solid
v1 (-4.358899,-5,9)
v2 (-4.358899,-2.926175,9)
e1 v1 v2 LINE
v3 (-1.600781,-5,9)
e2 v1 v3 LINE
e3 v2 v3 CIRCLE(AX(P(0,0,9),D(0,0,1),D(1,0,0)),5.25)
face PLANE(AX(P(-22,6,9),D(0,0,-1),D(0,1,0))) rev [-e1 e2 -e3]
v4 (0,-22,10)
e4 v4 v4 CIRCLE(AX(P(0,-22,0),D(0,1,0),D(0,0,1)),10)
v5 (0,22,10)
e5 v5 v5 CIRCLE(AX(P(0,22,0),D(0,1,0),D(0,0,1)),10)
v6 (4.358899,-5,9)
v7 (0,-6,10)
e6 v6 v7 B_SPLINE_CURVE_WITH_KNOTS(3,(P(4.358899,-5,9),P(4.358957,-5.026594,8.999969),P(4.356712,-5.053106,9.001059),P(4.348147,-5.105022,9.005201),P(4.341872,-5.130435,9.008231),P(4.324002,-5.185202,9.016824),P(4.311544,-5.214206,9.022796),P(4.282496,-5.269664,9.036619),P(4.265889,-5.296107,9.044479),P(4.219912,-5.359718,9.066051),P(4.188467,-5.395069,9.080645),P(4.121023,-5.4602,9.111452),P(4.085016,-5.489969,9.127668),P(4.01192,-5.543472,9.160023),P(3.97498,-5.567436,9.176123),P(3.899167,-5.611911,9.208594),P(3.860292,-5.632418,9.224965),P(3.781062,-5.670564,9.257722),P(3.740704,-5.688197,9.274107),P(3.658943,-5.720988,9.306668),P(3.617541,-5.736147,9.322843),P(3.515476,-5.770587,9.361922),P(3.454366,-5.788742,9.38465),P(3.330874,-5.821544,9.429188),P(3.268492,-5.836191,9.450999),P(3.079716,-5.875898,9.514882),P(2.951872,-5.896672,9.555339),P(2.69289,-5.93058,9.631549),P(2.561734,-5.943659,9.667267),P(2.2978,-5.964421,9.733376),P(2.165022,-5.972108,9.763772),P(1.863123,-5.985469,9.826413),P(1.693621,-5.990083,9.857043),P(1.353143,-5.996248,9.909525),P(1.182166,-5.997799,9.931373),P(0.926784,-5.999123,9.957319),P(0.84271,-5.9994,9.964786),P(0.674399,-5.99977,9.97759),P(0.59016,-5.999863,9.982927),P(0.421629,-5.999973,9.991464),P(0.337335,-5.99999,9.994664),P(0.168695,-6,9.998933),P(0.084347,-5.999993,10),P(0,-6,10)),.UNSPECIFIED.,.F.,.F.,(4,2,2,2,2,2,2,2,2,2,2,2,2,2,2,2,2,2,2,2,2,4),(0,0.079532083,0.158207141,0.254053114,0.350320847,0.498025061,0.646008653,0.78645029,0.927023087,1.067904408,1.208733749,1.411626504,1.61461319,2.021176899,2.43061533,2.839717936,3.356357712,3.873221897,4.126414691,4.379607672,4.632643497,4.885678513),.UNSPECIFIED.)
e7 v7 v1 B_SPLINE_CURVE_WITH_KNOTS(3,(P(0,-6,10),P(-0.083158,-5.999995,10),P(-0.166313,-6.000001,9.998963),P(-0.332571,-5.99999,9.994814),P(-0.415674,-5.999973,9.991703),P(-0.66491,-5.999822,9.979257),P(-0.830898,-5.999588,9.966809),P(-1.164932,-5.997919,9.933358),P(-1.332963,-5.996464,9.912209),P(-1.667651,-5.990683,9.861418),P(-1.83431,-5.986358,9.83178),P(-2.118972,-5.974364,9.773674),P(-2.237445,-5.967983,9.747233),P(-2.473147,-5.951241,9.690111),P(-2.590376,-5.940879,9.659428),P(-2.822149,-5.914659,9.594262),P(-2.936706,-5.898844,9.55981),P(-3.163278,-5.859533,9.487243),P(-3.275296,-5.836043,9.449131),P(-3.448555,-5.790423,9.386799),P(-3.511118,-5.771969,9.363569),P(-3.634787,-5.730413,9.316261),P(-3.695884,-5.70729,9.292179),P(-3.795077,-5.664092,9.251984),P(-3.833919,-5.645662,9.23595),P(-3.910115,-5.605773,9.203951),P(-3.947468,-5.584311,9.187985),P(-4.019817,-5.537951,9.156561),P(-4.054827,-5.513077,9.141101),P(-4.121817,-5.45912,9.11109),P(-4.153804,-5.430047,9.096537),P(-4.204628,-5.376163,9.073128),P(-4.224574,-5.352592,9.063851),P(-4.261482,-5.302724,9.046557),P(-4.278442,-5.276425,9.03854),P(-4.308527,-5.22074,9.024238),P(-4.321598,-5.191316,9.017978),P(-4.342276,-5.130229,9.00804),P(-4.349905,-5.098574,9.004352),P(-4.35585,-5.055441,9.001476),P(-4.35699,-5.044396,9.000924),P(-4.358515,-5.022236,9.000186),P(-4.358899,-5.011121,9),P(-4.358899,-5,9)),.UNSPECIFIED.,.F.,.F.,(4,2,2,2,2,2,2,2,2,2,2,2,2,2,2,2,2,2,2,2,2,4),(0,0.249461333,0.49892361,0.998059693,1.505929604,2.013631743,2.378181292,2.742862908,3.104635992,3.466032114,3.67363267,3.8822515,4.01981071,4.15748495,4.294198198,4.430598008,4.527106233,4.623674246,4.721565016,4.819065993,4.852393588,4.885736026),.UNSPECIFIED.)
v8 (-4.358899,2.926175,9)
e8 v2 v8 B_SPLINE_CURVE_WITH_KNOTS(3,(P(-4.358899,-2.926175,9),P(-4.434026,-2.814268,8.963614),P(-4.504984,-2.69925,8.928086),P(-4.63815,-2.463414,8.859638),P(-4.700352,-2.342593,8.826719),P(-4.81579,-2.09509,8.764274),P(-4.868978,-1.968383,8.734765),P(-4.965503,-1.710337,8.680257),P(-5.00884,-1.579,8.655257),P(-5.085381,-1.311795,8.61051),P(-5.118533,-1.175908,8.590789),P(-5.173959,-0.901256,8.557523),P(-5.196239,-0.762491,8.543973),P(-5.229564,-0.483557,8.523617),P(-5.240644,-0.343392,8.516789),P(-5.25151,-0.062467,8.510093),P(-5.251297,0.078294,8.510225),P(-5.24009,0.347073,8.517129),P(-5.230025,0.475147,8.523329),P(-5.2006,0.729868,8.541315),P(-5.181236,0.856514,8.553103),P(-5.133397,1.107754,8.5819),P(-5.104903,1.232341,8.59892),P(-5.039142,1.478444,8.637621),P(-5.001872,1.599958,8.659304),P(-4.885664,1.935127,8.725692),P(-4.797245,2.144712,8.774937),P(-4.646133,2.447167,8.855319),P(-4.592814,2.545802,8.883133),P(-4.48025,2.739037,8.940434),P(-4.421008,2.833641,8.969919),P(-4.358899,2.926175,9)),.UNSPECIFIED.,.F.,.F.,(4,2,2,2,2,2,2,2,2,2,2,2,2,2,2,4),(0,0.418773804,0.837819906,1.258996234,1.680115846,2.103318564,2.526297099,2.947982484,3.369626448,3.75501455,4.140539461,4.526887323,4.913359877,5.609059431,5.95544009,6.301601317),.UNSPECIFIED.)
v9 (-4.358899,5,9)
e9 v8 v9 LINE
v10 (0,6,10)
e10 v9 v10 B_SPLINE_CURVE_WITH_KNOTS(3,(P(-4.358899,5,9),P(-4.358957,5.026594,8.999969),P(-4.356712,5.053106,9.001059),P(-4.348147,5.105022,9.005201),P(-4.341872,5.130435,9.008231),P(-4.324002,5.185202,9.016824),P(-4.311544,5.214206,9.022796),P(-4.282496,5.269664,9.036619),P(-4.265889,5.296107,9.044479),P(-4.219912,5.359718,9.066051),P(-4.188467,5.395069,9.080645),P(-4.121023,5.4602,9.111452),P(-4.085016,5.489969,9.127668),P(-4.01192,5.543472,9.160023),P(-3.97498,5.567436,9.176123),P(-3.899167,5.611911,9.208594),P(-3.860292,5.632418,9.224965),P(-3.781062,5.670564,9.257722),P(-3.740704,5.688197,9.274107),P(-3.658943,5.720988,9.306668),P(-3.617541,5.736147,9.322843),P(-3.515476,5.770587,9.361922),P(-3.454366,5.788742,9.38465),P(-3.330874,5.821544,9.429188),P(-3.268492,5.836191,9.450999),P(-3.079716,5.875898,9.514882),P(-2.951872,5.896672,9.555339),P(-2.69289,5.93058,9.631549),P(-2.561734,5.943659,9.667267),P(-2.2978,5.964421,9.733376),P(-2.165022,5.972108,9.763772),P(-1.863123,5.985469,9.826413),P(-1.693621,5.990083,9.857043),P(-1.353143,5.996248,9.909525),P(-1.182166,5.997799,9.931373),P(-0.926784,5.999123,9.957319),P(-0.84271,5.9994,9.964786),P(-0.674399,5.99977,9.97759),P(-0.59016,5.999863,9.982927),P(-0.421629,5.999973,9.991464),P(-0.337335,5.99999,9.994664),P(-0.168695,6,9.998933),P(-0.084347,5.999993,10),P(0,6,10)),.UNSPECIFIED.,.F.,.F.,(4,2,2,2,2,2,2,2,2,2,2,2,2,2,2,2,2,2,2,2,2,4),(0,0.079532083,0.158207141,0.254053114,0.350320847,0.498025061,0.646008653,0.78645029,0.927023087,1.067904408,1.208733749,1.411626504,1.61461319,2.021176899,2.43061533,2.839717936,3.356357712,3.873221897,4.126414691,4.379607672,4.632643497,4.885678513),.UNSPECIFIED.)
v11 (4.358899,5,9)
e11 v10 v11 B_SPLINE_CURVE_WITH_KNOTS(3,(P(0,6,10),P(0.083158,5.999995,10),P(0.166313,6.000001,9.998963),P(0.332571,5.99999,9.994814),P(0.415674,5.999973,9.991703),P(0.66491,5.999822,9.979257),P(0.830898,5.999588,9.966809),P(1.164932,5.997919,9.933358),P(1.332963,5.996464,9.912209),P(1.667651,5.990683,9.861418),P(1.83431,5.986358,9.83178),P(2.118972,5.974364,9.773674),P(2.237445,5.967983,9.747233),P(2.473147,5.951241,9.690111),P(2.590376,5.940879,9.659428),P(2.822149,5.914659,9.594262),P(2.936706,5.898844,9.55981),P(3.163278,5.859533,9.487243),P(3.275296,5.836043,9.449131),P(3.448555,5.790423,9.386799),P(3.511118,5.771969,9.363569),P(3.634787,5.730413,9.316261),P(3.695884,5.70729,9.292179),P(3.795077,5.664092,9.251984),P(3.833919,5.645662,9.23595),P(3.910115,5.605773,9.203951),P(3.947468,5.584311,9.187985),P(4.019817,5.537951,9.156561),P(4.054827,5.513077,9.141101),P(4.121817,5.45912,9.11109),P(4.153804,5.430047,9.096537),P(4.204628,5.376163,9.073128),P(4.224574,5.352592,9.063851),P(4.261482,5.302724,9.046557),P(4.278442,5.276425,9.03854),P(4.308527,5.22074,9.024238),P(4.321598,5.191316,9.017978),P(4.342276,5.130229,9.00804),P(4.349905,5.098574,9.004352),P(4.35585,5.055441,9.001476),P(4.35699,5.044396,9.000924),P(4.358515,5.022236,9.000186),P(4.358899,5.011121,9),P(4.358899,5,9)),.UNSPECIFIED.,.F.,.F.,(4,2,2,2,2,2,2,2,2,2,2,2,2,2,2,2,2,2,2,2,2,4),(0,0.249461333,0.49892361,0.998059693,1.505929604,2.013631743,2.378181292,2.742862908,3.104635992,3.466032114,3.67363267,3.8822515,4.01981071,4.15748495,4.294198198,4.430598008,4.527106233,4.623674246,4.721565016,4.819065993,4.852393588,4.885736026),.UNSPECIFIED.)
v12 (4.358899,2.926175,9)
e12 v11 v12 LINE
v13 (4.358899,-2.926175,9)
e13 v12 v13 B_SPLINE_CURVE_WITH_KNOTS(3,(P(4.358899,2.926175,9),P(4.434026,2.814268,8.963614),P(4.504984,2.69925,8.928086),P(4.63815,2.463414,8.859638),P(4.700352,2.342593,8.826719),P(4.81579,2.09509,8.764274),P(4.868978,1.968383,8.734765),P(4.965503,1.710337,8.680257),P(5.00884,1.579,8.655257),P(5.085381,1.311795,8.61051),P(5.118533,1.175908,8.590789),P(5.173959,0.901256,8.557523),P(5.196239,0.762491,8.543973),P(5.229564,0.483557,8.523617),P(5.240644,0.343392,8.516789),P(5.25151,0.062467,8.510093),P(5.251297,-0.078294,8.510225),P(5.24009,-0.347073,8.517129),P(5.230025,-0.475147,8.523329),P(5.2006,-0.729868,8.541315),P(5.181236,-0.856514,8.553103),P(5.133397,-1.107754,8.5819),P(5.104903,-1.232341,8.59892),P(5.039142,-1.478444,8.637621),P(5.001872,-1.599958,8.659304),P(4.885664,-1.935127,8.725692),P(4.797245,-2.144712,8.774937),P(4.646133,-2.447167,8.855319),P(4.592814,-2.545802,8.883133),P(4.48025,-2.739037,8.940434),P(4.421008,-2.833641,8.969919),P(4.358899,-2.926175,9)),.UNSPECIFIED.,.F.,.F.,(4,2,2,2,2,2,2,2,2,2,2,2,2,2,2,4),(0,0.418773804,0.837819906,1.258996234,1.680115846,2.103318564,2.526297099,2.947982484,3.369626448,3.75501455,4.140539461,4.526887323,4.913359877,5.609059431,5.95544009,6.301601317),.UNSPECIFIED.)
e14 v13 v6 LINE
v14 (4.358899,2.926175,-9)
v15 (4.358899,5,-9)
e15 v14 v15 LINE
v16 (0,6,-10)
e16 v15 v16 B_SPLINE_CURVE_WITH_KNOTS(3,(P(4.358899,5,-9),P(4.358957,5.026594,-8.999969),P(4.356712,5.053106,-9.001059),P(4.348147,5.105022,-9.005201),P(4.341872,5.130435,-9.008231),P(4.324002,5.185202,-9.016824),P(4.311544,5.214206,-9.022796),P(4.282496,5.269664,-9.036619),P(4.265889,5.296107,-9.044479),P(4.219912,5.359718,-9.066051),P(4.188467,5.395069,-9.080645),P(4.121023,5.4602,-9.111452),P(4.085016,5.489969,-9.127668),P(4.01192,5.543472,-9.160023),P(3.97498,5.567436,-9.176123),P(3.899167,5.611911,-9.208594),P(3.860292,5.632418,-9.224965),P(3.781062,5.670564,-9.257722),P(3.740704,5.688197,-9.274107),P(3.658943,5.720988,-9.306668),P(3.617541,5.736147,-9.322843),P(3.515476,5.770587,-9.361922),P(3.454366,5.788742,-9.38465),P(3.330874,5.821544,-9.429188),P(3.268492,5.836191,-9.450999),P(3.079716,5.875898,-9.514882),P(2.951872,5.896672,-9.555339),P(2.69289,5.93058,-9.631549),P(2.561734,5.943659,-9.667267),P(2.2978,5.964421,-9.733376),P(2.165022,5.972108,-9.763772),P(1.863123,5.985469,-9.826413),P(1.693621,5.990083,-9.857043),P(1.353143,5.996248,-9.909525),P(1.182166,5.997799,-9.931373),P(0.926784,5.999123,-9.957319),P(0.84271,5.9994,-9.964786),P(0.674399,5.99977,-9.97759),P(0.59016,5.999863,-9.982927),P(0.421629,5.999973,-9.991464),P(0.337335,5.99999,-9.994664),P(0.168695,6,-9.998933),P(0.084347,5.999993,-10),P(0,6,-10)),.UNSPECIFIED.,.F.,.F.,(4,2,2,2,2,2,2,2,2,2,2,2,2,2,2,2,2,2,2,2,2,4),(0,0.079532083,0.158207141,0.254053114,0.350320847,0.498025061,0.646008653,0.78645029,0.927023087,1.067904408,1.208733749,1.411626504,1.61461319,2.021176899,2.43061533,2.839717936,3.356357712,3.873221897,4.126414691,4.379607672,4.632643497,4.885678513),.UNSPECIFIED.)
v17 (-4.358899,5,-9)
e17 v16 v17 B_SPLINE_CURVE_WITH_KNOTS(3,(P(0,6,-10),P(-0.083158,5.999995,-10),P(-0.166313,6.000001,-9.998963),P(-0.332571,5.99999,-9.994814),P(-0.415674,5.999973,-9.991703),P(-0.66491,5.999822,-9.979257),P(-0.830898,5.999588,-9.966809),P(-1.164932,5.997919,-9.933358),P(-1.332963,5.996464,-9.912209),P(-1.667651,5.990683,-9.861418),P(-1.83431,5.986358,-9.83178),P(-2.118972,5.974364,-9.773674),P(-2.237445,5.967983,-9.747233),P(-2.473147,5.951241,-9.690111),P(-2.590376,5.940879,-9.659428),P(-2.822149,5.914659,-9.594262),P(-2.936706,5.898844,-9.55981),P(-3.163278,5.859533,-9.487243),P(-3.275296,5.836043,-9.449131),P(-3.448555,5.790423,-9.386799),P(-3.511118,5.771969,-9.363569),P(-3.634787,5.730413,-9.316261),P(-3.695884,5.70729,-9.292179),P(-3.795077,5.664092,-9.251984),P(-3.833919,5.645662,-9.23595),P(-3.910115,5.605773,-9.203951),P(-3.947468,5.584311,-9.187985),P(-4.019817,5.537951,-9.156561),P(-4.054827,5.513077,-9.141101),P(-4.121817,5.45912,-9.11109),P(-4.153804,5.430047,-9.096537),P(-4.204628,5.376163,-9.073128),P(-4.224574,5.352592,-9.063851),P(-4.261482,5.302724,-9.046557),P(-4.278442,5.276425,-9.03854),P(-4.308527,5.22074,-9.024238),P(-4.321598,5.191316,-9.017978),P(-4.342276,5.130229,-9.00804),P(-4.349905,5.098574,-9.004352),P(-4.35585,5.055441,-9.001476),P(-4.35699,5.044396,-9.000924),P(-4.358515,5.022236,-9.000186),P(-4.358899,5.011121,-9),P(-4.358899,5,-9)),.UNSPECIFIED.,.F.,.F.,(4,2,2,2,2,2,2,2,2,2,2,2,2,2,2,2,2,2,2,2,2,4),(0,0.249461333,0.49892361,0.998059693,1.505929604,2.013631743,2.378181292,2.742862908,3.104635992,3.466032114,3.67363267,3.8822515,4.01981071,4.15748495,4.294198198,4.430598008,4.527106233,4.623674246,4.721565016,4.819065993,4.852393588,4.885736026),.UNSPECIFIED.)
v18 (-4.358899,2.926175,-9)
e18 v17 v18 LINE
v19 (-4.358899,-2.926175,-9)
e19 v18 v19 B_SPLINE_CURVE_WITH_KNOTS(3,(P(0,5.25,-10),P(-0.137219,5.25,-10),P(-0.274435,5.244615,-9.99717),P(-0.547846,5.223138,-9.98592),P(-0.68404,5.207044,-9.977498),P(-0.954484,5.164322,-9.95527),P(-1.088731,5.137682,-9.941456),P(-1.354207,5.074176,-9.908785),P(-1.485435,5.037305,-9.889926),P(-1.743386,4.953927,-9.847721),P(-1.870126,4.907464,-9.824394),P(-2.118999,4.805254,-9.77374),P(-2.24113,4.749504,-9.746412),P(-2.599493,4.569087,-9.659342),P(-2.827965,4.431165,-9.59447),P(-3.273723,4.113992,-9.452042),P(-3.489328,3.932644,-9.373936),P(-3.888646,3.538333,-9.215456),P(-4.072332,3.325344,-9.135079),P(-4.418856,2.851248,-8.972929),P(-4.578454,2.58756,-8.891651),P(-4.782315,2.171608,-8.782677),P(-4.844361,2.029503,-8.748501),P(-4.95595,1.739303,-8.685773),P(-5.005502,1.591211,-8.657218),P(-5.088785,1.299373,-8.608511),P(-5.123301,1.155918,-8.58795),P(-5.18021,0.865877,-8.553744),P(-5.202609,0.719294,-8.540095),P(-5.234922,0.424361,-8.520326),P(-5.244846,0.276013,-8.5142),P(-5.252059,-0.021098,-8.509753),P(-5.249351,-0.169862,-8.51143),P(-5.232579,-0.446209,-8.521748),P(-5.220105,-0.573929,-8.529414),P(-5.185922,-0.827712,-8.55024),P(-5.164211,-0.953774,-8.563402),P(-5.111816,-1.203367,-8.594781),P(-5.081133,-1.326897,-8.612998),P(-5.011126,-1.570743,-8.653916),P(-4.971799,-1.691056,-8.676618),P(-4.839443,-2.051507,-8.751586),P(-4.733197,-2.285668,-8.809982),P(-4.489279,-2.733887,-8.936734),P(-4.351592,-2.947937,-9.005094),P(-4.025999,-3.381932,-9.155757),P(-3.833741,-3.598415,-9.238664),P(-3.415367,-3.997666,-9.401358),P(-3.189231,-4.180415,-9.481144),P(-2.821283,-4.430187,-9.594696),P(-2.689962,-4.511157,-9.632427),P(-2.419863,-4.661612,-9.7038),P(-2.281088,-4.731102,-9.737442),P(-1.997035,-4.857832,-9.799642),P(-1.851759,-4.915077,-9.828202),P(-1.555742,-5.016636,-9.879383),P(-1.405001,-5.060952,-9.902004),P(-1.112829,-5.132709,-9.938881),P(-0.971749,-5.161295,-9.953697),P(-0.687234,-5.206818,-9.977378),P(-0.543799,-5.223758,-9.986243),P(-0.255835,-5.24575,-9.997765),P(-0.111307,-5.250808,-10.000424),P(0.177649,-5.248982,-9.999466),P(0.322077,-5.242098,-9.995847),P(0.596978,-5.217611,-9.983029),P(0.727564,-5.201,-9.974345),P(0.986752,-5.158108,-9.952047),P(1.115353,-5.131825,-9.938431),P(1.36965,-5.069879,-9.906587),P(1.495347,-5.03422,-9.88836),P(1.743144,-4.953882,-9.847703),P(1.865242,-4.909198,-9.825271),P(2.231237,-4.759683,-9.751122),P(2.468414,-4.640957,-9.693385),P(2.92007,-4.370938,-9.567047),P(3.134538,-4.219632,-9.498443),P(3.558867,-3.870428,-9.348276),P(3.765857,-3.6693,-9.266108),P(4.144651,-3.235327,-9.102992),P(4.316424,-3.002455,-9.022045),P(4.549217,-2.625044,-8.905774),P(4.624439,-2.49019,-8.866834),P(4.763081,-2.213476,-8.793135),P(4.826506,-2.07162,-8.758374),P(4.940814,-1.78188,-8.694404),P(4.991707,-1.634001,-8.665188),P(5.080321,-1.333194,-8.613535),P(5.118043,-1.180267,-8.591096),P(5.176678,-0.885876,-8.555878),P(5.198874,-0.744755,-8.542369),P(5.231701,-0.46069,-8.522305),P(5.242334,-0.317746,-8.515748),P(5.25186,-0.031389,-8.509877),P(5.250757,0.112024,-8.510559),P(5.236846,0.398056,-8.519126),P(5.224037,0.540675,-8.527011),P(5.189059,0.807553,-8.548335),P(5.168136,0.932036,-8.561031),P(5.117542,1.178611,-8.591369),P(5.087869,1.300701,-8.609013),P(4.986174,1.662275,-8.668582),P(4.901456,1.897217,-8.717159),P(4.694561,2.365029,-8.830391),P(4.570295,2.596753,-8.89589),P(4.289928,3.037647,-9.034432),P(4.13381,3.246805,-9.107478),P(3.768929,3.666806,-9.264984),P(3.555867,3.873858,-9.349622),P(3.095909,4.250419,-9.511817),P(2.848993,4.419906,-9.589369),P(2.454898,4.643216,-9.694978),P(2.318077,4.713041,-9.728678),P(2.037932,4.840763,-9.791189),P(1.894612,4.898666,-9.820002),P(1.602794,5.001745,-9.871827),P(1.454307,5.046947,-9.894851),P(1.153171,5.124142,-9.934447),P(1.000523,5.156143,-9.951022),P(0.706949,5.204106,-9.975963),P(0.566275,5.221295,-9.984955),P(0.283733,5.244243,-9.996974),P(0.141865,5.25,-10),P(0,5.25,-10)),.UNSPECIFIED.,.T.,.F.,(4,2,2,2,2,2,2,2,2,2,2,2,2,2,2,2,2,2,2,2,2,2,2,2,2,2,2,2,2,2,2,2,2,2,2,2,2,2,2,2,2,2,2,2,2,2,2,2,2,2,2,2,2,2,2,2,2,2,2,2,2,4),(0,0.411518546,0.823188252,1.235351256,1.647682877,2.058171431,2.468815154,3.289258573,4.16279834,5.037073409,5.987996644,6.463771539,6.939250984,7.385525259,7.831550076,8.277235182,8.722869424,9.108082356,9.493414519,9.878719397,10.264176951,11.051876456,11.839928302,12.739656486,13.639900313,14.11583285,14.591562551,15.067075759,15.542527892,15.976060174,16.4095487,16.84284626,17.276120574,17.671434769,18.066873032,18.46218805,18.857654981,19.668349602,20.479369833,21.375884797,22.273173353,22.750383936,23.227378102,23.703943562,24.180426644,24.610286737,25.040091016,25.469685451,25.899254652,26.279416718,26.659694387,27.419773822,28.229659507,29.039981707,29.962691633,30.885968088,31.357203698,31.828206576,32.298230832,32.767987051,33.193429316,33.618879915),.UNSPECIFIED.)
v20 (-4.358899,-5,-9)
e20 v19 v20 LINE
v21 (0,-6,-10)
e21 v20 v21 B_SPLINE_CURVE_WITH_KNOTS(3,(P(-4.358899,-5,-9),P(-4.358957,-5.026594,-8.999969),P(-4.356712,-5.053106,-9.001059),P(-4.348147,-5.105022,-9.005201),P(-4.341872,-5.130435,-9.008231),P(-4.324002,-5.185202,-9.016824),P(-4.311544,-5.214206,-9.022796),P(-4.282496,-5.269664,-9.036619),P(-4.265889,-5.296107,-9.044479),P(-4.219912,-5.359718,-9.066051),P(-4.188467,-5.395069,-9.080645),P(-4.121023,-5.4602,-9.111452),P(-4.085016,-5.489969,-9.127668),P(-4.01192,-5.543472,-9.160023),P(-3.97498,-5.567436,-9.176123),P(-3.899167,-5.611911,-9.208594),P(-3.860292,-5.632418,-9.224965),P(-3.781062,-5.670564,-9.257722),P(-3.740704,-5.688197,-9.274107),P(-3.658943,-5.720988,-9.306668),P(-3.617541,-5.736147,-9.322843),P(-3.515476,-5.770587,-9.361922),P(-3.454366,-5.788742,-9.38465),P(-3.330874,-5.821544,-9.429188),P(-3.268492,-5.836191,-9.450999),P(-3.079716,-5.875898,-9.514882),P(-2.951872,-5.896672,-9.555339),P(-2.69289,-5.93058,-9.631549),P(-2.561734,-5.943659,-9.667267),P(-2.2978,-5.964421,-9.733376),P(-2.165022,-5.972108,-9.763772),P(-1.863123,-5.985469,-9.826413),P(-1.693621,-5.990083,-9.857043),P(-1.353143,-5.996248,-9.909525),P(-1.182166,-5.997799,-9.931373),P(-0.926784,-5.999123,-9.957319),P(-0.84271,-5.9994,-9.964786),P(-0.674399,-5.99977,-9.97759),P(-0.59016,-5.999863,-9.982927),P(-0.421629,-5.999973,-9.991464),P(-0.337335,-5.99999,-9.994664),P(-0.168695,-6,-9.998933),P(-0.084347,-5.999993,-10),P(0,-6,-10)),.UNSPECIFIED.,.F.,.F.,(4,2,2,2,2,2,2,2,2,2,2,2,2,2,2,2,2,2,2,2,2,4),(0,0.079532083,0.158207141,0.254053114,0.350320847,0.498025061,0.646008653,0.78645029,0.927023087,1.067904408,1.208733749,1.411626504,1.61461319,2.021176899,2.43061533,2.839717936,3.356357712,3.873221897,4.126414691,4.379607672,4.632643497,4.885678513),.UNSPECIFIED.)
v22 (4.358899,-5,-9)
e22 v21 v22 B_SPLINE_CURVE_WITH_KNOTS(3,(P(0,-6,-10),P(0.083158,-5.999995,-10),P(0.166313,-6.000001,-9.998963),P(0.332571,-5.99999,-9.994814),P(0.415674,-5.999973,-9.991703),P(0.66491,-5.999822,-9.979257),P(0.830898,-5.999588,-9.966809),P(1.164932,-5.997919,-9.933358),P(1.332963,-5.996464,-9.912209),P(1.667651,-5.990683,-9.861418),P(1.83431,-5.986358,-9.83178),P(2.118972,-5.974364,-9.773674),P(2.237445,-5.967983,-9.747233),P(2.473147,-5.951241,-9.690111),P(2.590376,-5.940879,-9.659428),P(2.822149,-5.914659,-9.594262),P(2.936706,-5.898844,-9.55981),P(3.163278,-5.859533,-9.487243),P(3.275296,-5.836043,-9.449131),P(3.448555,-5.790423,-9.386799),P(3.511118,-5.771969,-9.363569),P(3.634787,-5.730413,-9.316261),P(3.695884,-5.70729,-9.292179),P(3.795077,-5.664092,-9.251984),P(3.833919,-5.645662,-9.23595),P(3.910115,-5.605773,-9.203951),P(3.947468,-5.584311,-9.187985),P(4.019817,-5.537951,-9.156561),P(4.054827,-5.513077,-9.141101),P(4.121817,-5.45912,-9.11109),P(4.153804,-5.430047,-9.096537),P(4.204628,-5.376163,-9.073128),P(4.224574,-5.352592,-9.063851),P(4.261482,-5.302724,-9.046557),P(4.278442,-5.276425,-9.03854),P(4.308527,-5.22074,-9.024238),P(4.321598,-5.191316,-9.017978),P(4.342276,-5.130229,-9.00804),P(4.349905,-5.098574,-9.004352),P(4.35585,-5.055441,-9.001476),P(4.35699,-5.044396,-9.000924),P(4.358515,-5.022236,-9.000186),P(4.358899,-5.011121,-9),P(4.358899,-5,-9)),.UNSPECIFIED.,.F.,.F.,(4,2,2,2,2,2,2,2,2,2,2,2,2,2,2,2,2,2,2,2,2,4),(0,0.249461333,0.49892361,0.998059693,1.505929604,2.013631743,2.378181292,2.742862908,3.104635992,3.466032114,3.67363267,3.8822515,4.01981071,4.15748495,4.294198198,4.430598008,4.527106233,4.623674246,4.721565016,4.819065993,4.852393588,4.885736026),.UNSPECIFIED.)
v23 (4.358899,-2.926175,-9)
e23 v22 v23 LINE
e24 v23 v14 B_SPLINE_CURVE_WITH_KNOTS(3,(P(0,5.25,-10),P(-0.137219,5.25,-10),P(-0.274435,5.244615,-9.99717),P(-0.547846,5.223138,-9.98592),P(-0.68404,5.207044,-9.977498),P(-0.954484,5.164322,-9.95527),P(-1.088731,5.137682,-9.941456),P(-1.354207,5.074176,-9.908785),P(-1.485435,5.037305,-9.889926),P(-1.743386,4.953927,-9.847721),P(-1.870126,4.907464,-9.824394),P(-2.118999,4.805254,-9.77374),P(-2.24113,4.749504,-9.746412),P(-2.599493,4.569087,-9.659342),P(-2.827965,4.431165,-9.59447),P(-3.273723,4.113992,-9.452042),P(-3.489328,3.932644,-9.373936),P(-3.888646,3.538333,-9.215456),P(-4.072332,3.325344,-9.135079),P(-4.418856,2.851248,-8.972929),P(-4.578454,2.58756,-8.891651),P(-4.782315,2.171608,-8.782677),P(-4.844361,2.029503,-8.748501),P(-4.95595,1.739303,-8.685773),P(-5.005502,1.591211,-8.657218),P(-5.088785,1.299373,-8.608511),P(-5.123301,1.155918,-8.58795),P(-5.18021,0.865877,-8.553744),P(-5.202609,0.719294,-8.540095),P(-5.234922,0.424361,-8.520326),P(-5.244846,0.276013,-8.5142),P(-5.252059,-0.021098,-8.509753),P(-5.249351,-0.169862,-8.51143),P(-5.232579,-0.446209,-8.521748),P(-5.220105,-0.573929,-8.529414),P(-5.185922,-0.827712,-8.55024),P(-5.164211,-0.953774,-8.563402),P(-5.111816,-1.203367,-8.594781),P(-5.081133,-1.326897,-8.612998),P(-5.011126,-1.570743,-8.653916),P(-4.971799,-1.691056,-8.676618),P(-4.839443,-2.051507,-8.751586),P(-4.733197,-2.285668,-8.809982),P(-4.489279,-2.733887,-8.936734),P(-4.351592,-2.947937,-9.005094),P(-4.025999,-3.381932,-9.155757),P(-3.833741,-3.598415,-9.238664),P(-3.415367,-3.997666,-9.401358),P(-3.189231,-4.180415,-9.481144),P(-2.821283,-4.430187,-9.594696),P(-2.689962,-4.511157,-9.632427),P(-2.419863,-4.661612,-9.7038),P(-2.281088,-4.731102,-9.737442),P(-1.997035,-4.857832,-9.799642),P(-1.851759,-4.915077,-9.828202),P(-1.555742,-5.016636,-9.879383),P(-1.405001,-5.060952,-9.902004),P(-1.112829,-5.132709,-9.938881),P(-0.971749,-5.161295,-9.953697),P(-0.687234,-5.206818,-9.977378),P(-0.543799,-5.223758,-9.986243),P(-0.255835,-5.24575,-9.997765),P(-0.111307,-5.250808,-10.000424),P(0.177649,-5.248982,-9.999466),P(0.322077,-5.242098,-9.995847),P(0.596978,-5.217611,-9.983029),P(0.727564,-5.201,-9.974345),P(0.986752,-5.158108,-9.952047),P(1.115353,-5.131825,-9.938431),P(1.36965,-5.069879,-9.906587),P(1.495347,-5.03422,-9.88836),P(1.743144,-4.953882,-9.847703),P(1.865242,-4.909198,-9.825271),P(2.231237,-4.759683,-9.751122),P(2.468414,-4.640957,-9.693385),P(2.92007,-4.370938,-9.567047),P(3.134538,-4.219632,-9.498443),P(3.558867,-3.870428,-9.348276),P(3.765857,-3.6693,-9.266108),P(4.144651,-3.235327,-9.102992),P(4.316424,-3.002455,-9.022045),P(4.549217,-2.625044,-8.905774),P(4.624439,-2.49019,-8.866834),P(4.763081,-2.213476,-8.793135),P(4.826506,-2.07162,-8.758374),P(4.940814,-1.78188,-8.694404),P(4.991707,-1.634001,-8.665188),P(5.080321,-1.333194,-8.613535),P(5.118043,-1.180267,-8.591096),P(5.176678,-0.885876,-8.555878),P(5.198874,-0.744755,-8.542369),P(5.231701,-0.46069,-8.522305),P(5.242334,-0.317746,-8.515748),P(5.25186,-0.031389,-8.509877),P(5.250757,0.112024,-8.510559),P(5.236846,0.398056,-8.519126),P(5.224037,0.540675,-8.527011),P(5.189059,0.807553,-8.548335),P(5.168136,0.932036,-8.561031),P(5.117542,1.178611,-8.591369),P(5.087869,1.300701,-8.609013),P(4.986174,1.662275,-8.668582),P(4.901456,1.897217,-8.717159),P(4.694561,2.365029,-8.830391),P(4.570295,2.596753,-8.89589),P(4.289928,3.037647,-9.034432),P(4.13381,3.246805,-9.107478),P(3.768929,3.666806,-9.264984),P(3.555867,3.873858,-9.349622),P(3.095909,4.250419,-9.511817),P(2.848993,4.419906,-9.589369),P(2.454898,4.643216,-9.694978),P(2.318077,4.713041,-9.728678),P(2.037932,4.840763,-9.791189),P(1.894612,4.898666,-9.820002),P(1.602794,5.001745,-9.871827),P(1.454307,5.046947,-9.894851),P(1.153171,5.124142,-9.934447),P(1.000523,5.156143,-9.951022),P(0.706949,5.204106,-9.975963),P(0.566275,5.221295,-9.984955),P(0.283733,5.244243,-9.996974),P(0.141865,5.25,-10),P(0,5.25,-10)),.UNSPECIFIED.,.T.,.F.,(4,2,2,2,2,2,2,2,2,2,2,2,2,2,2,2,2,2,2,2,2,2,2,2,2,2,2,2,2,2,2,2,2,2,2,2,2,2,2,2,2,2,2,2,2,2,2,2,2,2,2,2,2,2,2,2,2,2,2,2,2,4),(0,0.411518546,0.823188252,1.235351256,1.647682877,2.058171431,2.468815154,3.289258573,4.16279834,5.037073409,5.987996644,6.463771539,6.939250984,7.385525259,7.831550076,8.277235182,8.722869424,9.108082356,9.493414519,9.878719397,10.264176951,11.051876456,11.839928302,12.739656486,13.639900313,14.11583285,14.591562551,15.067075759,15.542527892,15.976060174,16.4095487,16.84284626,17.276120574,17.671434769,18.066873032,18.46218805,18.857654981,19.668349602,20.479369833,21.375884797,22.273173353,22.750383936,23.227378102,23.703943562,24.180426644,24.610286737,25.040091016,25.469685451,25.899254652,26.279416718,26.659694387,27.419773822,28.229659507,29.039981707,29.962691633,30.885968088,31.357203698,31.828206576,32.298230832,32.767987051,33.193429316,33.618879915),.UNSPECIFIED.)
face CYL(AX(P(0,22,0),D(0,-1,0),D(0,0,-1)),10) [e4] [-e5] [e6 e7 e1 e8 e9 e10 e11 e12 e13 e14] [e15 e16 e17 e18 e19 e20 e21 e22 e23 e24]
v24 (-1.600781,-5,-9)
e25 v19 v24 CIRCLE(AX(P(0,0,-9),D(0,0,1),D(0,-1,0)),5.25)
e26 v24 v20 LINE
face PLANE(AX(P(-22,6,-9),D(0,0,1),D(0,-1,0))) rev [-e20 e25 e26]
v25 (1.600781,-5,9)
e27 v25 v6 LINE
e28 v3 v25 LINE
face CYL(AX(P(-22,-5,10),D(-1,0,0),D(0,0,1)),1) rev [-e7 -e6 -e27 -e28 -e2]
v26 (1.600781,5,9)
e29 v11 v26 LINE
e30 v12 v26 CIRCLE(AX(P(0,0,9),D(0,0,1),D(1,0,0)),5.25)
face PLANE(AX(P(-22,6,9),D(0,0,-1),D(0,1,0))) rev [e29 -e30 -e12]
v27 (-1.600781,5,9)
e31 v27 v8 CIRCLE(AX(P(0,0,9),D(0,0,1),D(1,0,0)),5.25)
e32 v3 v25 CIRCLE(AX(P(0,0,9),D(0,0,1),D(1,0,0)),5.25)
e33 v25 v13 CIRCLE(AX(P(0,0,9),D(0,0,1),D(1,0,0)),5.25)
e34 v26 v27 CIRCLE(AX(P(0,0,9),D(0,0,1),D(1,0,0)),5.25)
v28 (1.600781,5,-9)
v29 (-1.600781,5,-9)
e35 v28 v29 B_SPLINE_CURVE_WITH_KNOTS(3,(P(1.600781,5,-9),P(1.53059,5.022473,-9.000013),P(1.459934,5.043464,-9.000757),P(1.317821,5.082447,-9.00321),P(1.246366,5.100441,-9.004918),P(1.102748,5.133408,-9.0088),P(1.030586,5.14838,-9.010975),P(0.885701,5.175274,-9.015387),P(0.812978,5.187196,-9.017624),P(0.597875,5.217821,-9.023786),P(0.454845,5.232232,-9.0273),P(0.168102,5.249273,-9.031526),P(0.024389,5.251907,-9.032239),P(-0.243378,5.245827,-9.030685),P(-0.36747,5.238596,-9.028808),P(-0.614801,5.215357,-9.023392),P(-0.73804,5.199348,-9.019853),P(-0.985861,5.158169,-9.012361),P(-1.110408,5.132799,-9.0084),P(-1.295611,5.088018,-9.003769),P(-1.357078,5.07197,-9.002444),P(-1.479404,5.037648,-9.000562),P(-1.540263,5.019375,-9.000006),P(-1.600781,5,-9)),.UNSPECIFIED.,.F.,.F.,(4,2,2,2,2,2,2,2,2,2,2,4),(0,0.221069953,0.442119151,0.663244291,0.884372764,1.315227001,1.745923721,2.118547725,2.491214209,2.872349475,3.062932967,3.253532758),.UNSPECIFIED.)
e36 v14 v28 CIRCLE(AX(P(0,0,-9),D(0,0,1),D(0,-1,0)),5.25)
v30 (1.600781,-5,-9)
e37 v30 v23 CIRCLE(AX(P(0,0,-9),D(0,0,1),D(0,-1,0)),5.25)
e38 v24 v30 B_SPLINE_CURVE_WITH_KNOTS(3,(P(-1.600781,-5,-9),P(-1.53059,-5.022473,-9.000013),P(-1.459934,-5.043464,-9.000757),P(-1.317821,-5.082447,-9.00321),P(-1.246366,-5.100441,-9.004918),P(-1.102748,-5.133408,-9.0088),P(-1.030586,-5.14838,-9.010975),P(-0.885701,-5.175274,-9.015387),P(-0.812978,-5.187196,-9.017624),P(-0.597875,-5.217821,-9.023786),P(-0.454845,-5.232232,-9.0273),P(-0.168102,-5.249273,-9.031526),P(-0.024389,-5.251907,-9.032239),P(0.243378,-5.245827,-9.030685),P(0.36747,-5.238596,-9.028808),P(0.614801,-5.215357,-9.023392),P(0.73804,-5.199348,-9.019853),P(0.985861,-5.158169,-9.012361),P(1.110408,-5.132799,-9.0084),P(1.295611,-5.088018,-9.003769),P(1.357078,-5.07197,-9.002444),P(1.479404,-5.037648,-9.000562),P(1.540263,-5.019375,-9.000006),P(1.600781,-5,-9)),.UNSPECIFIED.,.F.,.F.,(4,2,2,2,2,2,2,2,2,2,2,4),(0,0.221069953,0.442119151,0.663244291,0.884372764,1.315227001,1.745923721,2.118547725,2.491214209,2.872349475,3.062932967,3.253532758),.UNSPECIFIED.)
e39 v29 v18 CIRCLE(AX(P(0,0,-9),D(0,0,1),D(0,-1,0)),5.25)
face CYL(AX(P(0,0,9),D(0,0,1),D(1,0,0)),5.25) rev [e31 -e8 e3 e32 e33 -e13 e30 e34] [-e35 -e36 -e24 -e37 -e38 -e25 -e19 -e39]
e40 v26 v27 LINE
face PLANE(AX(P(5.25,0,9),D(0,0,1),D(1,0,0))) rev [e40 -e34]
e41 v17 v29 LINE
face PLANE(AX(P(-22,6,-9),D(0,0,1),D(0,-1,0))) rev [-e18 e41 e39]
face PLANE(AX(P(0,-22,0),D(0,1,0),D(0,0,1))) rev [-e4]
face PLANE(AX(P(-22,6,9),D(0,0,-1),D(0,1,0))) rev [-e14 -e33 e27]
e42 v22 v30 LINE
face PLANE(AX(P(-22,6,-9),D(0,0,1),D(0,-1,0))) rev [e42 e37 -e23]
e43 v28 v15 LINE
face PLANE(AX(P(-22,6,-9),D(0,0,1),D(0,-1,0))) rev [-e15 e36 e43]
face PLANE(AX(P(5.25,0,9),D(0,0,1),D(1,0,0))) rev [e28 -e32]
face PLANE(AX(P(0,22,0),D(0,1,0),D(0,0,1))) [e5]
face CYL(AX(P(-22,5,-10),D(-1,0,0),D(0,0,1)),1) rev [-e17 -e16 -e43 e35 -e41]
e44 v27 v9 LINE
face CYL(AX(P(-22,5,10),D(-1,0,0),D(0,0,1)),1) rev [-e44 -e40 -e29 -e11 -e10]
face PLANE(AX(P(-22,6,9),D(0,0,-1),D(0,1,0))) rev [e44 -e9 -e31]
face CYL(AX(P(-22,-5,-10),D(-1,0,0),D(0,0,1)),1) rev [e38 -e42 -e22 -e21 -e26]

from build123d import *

# Parameters (mm, degrees)
SKETCH_1_R          = 10
EXTRUDE_1_DEPTH     = 22
SKETCH_4_W          = 3.52564581
SKETCH_4_H          = 12
CUT_EXTRUDE_1_DEPTH = 22
FILLET_1_R          = 1
SKETCH2_W           = 5.25
SKETCH2_H           = 19


with BuildPart() as part:
    # ｽｹｯﾁ1 → ﾎﾞｽ - 押し出し1 (new, symmetric)
    with BuildSketch(Plane(origin=(0, 0, 0), x_dir=(1, 0, 0), z_dir=(0, 1, 0))):
        with Locations(Location((0, 0, 0), (0, 0, 270))):
            Circle(SKETCH_1_R)
    extrude(amount=EXTRUDE_1_DEPTH, both=True)

    # ｽｹｯﾁ4 → ｶｯﾄ - 押し出し1 (cut, symmetric)
    with BuildSketch(Plane(origin=(0, 0, 0), x_dir=(0, 0, -1), z_dir=(1, 0, 0))):
        with Locations((-10.762822905, 0)):
            Rectangle(SKETCH_4_W, SKETCH_4_H)
        with Locations((10.762822905, 0)):
            Rectangle(SKETCH_4_W, SKETCH_4_H)
    extrude(amount=CUT_EXTRUDE_1_DEPTH, both=True, mode=Mode.SUBTRACT)

    # ﾌｨﾚｯﾄ1
    fillet_1_edges = [part.edges().sort_by_distance(p)[0] for p in [
        (0, -6, -9),
        (0, 6, -9),
        (0, -6, 9),
        (0, 6, 9),
    ]]
    fillet(fillet_1_edges, radius=FILLET_1_R - 0.0001)  # a hair under: the kernel refuses the full size

    # Sketch2 → M12x1.5 ねじ穴1 (revolve, cut)
    with BuildSketch(Plane(origin=(0, 0, 9), x_dir=(0, -1, 0), z_dir=(1, 0, 0))):
        with Locations((2.625, 9.5)):
            Rectangle(SKETCH2_W, SKETCH2_H)
    revolve(axis=Axis((0, 0, 15.35), (0, 0, -1)), mode=Mode.SUBTRACT)


solid = part.part
